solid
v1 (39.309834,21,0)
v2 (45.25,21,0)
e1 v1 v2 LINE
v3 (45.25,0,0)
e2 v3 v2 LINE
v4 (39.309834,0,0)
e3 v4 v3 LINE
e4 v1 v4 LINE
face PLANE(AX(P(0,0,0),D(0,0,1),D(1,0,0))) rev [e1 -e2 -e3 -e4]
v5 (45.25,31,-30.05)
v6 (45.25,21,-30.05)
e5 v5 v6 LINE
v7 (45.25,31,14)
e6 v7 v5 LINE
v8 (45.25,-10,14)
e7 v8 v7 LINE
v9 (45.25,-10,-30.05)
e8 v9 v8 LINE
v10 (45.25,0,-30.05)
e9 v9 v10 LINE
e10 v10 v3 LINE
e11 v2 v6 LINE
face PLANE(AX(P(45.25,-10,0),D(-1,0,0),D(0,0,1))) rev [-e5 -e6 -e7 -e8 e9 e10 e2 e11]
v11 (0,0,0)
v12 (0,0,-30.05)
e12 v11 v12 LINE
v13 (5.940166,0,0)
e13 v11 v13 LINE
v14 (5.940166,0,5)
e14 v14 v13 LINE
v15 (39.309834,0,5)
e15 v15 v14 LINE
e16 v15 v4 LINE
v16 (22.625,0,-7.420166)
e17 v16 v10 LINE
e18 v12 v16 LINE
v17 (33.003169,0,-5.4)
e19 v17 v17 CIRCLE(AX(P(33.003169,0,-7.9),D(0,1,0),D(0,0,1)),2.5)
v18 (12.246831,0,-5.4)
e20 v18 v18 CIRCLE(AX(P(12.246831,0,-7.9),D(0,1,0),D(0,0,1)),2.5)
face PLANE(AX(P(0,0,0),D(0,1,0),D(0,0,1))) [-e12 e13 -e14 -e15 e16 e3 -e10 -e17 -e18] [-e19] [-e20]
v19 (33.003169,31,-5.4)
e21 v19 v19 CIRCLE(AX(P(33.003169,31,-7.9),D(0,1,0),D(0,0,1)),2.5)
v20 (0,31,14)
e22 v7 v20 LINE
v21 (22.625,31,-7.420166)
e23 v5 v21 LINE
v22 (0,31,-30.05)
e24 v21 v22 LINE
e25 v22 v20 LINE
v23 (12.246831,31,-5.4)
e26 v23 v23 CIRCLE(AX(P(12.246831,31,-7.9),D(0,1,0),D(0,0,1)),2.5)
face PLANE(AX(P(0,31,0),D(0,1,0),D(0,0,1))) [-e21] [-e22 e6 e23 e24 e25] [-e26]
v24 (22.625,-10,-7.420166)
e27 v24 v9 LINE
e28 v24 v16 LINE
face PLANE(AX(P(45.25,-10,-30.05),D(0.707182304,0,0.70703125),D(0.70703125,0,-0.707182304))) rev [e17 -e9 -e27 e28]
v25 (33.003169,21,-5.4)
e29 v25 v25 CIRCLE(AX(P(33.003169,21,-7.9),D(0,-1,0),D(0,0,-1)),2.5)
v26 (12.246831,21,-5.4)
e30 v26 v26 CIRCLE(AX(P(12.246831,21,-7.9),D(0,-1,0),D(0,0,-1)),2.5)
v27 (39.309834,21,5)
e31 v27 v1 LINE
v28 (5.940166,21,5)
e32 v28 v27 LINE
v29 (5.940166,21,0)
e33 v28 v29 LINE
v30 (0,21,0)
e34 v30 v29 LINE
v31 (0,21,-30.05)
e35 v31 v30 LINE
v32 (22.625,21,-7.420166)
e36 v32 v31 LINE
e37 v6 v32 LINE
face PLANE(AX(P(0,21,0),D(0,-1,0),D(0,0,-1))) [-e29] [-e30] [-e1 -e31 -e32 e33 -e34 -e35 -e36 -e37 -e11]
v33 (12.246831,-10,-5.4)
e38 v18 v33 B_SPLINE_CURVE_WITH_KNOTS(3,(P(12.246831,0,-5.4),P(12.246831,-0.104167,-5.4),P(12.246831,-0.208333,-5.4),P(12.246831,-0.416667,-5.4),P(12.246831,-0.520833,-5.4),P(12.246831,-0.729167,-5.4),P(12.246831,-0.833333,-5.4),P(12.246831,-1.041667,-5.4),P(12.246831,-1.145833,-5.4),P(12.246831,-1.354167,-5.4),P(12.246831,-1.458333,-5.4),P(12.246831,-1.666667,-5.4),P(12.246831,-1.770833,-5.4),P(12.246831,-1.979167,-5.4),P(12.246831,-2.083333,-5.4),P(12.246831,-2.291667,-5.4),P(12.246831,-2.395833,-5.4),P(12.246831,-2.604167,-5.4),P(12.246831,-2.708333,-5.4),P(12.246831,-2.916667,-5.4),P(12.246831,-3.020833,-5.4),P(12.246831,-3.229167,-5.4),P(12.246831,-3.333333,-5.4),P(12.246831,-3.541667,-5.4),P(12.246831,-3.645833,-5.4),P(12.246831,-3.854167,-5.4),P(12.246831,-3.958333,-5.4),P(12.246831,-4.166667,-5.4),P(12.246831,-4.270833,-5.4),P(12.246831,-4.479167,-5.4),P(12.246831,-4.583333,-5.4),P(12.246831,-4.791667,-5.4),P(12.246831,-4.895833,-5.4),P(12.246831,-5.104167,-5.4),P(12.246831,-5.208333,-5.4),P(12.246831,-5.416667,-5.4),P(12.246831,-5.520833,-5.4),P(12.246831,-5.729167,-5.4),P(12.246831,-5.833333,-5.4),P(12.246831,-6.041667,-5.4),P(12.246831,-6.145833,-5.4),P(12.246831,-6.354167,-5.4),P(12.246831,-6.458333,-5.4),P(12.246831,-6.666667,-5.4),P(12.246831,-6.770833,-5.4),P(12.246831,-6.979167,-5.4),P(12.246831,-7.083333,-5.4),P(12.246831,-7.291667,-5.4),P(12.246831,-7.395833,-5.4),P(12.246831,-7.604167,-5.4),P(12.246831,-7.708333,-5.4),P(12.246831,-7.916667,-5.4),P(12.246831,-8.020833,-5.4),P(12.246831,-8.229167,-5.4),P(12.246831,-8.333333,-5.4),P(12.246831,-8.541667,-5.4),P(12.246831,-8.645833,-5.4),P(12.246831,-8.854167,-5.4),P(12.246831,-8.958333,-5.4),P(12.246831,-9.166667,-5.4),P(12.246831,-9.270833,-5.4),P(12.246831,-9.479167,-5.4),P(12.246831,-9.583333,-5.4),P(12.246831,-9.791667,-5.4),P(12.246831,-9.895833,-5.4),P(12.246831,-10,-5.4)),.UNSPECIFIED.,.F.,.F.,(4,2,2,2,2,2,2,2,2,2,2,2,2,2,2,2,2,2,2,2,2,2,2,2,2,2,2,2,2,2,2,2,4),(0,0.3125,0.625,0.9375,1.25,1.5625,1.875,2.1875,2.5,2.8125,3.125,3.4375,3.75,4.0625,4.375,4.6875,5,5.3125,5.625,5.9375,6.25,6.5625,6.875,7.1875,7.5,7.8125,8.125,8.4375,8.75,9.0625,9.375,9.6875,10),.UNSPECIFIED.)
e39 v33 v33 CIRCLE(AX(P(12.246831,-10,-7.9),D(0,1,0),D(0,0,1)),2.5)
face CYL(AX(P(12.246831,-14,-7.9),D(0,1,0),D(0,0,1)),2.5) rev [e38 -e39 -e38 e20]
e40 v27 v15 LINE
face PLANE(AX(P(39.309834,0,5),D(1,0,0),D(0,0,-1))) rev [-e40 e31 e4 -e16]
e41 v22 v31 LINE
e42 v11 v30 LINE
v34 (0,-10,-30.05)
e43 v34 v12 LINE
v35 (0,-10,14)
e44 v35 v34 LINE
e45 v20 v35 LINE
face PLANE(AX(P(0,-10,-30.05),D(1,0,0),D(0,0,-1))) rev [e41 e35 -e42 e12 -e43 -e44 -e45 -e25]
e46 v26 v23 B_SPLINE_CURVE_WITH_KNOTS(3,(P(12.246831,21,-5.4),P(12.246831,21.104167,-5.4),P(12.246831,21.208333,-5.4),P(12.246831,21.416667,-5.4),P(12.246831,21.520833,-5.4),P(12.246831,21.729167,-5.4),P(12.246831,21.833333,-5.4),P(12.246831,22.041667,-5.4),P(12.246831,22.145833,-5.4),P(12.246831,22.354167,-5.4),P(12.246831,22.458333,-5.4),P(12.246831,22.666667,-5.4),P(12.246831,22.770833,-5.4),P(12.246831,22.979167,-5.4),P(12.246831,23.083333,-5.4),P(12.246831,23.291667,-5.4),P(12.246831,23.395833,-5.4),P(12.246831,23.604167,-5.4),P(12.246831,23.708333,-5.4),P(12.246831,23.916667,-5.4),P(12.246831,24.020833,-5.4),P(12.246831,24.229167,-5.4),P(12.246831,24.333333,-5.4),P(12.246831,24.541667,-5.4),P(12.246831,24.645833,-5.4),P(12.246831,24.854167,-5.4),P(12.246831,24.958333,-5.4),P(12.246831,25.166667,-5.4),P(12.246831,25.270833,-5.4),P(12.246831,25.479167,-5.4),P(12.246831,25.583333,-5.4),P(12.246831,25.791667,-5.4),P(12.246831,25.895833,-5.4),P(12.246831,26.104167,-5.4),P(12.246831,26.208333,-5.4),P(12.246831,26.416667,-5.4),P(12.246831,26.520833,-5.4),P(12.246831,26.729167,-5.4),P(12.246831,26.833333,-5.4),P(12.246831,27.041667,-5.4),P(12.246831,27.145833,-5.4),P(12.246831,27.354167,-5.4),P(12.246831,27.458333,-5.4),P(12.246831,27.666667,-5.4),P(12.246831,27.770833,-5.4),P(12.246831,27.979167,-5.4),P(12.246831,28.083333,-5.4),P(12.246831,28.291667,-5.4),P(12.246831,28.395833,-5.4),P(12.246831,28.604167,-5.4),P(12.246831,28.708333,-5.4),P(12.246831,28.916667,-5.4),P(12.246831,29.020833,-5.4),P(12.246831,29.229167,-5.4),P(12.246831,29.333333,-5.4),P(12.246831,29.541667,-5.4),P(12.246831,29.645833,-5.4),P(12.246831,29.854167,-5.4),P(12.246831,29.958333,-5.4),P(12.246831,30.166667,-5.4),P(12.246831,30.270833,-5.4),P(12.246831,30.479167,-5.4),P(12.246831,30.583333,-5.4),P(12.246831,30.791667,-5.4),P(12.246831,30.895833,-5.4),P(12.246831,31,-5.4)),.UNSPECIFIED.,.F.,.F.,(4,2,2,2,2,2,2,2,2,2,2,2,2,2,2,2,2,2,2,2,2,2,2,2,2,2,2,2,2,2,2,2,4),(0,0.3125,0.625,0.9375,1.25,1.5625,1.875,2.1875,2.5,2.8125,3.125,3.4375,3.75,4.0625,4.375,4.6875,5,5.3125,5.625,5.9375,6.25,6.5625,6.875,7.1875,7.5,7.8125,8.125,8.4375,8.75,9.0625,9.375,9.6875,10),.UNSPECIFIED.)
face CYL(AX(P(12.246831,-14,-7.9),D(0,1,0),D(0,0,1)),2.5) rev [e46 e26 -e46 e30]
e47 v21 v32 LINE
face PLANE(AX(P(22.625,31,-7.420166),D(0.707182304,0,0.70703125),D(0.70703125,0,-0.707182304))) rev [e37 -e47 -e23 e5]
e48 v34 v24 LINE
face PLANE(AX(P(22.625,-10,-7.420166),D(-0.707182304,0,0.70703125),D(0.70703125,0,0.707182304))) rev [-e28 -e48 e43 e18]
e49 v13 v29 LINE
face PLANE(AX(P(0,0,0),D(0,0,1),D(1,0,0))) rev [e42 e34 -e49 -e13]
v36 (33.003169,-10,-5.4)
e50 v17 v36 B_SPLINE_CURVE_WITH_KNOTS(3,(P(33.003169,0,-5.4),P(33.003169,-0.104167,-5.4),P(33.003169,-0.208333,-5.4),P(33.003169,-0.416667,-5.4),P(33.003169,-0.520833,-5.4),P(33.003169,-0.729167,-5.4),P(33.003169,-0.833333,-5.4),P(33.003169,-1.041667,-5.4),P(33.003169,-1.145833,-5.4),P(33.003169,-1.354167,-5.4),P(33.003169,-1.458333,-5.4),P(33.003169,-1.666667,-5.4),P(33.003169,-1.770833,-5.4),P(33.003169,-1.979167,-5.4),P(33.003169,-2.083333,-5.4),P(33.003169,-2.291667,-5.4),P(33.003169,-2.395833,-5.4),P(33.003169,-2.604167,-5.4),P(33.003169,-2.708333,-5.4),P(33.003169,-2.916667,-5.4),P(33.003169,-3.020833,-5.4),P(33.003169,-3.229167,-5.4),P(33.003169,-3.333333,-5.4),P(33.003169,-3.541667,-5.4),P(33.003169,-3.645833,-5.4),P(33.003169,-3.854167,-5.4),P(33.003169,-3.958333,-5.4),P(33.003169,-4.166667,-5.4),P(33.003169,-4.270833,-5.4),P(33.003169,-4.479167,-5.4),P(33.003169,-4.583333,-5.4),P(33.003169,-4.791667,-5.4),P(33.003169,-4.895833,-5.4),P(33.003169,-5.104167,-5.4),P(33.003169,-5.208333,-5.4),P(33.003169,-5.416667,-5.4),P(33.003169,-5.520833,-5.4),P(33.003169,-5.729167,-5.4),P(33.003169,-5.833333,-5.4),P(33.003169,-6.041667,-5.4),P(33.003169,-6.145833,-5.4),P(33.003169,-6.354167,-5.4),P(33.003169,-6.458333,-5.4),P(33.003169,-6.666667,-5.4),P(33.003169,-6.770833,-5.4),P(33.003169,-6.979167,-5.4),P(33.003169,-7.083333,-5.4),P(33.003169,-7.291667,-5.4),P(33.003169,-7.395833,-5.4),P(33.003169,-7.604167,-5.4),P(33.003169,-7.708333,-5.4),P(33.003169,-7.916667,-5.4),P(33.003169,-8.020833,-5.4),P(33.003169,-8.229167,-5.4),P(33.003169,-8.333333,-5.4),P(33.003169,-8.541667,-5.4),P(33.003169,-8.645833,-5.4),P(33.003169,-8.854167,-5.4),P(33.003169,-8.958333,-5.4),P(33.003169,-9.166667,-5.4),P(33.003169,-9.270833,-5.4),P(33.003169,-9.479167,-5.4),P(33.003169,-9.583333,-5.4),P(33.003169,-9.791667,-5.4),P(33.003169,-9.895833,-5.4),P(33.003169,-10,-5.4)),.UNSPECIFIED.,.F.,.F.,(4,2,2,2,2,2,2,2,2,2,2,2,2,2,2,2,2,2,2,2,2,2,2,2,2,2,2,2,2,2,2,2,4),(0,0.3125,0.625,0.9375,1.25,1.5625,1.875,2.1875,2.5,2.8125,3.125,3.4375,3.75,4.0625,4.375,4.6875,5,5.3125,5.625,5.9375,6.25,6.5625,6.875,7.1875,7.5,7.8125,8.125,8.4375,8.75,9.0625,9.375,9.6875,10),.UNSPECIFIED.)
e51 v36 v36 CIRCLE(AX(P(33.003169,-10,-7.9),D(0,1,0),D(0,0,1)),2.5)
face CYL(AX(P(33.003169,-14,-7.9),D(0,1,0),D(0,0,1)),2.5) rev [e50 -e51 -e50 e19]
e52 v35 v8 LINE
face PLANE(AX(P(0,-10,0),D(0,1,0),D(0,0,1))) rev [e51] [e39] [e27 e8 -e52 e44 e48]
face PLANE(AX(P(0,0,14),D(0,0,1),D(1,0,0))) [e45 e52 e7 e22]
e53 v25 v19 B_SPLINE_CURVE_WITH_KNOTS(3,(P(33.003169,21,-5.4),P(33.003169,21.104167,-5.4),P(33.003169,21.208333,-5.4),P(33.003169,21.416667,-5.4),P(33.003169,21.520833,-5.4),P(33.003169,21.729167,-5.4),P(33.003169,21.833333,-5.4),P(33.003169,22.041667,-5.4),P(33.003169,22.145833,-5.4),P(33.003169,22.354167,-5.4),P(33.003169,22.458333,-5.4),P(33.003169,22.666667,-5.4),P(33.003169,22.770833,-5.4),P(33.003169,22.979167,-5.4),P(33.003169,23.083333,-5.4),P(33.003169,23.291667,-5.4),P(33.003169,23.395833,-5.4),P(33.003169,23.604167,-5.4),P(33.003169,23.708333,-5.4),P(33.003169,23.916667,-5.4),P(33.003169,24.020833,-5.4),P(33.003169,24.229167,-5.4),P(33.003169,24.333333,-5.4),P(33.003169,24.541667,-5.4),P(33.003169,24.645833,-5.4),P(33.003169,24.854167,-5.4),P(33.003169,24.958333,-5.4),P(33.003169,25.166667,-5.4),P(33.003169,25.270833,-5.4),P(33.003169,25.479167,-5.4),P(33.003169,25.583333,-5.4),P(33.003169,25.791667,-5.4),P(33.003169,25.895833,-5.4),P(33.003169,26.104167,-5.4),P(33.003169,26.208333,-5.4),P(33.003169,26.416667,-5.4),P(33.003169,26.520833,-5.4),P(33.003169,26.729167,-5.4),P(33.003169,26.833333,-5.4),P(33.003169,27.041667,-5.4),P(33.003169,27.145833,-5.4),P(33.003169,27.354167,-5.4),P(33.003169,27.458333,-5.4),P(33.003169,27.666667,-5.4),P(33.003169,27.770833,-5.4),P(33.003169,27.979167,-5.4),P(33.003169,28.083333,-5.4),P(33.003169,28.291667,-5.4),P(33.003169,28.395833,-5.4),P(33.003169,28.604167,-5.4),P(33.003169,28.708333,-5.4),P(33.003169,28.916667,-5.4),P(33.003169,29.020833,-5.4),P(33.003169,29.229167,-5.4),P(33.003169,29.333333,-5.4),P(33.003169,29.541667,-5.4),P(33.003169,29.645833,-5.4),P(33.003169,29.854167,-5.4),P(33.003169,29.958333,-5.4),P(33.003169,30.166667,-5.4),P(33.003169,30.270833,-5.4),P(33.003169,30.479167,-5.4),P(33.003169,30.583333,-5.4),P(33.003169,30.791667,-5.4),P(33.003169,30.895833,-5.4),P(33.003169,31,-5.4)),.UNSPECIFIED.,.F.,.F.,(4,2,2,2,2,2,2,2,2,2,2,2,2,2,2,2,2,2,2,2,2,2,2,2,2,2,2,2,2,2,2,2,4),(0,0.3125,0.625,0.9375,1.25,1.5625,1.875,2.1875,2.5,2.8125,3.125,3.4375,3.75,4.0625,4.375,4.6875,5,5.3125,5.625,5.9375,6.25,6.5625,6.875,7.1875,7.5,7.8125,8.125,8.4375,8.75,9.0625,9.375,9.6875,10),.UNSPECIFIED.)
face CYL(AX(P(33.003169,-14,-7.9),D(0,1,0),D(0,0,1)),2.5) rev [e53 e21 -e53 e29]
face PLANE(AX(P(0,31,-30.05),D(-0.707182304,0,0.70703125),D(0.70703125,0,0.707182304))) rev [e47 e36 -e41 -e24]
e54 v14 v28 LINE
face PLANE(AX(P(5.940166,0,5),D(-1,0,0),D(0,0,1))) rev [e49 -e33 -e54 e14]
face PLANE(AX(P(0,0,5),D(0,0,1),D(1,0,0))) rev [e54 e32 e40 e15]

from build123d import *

# Parameters (mm, degrees)
SKETCH1_W           = 45.25
SKETCH1_H           = 21
BOSS_EXTRUDE1_DEPTH = 8
BOSS_EXTRUDE3_DEPTH = 10
BOSS_EXTRUDE4_DEPTH = 10
SKETCH5_W           = 45.25
SKETCH5_H           = 8
BOSS_EXTRUDE5_DEPTH = 10
SKETCH6_W           = 45.25
SKETCH6_H           = 8
BOSS_EXTRUDE6_DEPTH = 10
SKETCH7_W           = 33.369667902
SKETCH7_H           = 21
CUT_EXTRUDE1_DEPTH  = 5
SKETCH8_W           = 45.25
SKETCH8_H           = 41
BOSS_EXTRUDE7_DEPTH = 6
HOLE1_START         = -10
HOLE1_OUTLINE_R     = 2.5
HOLE1_DEPTH         = 41
HOLE2_START         = -10
HOLE2_OUTLINE_R     = 2.5
HOLE2_DEPTH         = 41


# Read off the part's stored shape, not the designer's step: Hole1, Hole2
with BuildPart() as part:
    # Sketch1 → Boss-Extrude1 (new body)
    with BuildSketch(Plane.XY):
        with Locations((22.625, 10.5)):
            Rectangle(SKETCH1_W, SKETCH1_H)
    extrude(amount=BOSS_EXTRUDE1_DEPTH)



with BuildPart() as body_2:
    # Sketch3 → Boss-Extrude3 (new body)
    with BuildSketch(Plane(origin=(0, 21, 0), x_dir=(1, 0, 0), z_dir=(0, 1, 0))):
        Polygon((45.25, 0), (0, 0), (0, 30.05), (22.625, 7.420166262), (45.25, 30.05), align=None)
    extrude(amount=BOSS_EXTRUDE3_DEPTH)


with BuildPart() as body_3:
    # Sketch4 → Boss-Extrude4 (new body)
    with BuildSketch(Plane.XZ):
        Polygon((0, 0), (45.25, 0), (45.25, -30.05), (22.625, -7.420166262), (0, -30.05), align=None)
    extrude(amount=BOSS_EXTRUDE4_DEPTH)


with BuildPart() as part_1:
    add(part.part)

    add(body_2.part)  # Boss-Extrude5 merges body 2
    # Sketch5 → Boss-Extrude5 (add)
    with BuildSketch(Plane(origin=(0, 21, 0), x_dir=(1, 0, 0), z_dir=(0, 1, 0))):
        with Locations((22.625, -4)):
            Rectangle(SKETCH5_W, SKETCH5_H)
    extrude(amount=BOSS_EXTRUDE5_DEPTH)


    add(body_3.part)  # Boss-Extrude6 merges body 3
    # Sketch6 → Boss-Extrude6 (add)
    with BuildSketch(Plane.XZ):
        with Locations((22.625, 4)):
            Rectangle(SKETCH6_W, SKETCH6_H)
    extrude(amount=BOSS_EXTRUDE6_DEPTH)

    # Sketch7 → Cut-Extrude1 (cut)
    with BuildSketch(Plane(origin=(0, 0, 0), x_dir=(-1, 0, 0), z_dir=(0, 0, -1))):
        with Locations((-22.625, 10.5)):
            Rectangle(SKETCH7_W, SKETCH7_H)
    extrude(amount=-CUT_EXTRUDE1_DEPTH, mode=Mode.SUBTRACT)

    # Sketch8 → Boss-Extrude7 (add)
    with BuildSketch(Plane.XY.offset(8)):
        with Locations((22.625, 10.5)):
            Rectangle(SKETCH8_W, SKETCH8_H)
    extrude(amount=BOSS_EXTRUDE7_DEPTH)

    # Hole1 outline → Hole1 (cut)
    with BuildSketch(Plane(origin=(0, 0, 0), x_dir=(1, 0, 0), z_dir=(0, 1, 0)).offset(HOLE1_START)):
        with Locations((33.003168971, 7.9)):
            Circle(HOLE1_OUTLINE_R)
    extrude(amount=HOLE1_DEPTH, mode=Mode.SUBTRACT)

    # Hole2 outline → Hole2 (cut)
    with BuildSketch(Plane(origin=(0, 0, 0), x_dir=(1, 0, 0), z_dir=(0, 1, 0)).offset(HOLE2_START)):
        with Locations((12.246831029, 7.9)):
            Circle(HOLE2_OUTLINE_R)
    extrude(amount=HOLE2_DEPTH, mode=Mode.SUBTRACT)


solid = part_1.part
